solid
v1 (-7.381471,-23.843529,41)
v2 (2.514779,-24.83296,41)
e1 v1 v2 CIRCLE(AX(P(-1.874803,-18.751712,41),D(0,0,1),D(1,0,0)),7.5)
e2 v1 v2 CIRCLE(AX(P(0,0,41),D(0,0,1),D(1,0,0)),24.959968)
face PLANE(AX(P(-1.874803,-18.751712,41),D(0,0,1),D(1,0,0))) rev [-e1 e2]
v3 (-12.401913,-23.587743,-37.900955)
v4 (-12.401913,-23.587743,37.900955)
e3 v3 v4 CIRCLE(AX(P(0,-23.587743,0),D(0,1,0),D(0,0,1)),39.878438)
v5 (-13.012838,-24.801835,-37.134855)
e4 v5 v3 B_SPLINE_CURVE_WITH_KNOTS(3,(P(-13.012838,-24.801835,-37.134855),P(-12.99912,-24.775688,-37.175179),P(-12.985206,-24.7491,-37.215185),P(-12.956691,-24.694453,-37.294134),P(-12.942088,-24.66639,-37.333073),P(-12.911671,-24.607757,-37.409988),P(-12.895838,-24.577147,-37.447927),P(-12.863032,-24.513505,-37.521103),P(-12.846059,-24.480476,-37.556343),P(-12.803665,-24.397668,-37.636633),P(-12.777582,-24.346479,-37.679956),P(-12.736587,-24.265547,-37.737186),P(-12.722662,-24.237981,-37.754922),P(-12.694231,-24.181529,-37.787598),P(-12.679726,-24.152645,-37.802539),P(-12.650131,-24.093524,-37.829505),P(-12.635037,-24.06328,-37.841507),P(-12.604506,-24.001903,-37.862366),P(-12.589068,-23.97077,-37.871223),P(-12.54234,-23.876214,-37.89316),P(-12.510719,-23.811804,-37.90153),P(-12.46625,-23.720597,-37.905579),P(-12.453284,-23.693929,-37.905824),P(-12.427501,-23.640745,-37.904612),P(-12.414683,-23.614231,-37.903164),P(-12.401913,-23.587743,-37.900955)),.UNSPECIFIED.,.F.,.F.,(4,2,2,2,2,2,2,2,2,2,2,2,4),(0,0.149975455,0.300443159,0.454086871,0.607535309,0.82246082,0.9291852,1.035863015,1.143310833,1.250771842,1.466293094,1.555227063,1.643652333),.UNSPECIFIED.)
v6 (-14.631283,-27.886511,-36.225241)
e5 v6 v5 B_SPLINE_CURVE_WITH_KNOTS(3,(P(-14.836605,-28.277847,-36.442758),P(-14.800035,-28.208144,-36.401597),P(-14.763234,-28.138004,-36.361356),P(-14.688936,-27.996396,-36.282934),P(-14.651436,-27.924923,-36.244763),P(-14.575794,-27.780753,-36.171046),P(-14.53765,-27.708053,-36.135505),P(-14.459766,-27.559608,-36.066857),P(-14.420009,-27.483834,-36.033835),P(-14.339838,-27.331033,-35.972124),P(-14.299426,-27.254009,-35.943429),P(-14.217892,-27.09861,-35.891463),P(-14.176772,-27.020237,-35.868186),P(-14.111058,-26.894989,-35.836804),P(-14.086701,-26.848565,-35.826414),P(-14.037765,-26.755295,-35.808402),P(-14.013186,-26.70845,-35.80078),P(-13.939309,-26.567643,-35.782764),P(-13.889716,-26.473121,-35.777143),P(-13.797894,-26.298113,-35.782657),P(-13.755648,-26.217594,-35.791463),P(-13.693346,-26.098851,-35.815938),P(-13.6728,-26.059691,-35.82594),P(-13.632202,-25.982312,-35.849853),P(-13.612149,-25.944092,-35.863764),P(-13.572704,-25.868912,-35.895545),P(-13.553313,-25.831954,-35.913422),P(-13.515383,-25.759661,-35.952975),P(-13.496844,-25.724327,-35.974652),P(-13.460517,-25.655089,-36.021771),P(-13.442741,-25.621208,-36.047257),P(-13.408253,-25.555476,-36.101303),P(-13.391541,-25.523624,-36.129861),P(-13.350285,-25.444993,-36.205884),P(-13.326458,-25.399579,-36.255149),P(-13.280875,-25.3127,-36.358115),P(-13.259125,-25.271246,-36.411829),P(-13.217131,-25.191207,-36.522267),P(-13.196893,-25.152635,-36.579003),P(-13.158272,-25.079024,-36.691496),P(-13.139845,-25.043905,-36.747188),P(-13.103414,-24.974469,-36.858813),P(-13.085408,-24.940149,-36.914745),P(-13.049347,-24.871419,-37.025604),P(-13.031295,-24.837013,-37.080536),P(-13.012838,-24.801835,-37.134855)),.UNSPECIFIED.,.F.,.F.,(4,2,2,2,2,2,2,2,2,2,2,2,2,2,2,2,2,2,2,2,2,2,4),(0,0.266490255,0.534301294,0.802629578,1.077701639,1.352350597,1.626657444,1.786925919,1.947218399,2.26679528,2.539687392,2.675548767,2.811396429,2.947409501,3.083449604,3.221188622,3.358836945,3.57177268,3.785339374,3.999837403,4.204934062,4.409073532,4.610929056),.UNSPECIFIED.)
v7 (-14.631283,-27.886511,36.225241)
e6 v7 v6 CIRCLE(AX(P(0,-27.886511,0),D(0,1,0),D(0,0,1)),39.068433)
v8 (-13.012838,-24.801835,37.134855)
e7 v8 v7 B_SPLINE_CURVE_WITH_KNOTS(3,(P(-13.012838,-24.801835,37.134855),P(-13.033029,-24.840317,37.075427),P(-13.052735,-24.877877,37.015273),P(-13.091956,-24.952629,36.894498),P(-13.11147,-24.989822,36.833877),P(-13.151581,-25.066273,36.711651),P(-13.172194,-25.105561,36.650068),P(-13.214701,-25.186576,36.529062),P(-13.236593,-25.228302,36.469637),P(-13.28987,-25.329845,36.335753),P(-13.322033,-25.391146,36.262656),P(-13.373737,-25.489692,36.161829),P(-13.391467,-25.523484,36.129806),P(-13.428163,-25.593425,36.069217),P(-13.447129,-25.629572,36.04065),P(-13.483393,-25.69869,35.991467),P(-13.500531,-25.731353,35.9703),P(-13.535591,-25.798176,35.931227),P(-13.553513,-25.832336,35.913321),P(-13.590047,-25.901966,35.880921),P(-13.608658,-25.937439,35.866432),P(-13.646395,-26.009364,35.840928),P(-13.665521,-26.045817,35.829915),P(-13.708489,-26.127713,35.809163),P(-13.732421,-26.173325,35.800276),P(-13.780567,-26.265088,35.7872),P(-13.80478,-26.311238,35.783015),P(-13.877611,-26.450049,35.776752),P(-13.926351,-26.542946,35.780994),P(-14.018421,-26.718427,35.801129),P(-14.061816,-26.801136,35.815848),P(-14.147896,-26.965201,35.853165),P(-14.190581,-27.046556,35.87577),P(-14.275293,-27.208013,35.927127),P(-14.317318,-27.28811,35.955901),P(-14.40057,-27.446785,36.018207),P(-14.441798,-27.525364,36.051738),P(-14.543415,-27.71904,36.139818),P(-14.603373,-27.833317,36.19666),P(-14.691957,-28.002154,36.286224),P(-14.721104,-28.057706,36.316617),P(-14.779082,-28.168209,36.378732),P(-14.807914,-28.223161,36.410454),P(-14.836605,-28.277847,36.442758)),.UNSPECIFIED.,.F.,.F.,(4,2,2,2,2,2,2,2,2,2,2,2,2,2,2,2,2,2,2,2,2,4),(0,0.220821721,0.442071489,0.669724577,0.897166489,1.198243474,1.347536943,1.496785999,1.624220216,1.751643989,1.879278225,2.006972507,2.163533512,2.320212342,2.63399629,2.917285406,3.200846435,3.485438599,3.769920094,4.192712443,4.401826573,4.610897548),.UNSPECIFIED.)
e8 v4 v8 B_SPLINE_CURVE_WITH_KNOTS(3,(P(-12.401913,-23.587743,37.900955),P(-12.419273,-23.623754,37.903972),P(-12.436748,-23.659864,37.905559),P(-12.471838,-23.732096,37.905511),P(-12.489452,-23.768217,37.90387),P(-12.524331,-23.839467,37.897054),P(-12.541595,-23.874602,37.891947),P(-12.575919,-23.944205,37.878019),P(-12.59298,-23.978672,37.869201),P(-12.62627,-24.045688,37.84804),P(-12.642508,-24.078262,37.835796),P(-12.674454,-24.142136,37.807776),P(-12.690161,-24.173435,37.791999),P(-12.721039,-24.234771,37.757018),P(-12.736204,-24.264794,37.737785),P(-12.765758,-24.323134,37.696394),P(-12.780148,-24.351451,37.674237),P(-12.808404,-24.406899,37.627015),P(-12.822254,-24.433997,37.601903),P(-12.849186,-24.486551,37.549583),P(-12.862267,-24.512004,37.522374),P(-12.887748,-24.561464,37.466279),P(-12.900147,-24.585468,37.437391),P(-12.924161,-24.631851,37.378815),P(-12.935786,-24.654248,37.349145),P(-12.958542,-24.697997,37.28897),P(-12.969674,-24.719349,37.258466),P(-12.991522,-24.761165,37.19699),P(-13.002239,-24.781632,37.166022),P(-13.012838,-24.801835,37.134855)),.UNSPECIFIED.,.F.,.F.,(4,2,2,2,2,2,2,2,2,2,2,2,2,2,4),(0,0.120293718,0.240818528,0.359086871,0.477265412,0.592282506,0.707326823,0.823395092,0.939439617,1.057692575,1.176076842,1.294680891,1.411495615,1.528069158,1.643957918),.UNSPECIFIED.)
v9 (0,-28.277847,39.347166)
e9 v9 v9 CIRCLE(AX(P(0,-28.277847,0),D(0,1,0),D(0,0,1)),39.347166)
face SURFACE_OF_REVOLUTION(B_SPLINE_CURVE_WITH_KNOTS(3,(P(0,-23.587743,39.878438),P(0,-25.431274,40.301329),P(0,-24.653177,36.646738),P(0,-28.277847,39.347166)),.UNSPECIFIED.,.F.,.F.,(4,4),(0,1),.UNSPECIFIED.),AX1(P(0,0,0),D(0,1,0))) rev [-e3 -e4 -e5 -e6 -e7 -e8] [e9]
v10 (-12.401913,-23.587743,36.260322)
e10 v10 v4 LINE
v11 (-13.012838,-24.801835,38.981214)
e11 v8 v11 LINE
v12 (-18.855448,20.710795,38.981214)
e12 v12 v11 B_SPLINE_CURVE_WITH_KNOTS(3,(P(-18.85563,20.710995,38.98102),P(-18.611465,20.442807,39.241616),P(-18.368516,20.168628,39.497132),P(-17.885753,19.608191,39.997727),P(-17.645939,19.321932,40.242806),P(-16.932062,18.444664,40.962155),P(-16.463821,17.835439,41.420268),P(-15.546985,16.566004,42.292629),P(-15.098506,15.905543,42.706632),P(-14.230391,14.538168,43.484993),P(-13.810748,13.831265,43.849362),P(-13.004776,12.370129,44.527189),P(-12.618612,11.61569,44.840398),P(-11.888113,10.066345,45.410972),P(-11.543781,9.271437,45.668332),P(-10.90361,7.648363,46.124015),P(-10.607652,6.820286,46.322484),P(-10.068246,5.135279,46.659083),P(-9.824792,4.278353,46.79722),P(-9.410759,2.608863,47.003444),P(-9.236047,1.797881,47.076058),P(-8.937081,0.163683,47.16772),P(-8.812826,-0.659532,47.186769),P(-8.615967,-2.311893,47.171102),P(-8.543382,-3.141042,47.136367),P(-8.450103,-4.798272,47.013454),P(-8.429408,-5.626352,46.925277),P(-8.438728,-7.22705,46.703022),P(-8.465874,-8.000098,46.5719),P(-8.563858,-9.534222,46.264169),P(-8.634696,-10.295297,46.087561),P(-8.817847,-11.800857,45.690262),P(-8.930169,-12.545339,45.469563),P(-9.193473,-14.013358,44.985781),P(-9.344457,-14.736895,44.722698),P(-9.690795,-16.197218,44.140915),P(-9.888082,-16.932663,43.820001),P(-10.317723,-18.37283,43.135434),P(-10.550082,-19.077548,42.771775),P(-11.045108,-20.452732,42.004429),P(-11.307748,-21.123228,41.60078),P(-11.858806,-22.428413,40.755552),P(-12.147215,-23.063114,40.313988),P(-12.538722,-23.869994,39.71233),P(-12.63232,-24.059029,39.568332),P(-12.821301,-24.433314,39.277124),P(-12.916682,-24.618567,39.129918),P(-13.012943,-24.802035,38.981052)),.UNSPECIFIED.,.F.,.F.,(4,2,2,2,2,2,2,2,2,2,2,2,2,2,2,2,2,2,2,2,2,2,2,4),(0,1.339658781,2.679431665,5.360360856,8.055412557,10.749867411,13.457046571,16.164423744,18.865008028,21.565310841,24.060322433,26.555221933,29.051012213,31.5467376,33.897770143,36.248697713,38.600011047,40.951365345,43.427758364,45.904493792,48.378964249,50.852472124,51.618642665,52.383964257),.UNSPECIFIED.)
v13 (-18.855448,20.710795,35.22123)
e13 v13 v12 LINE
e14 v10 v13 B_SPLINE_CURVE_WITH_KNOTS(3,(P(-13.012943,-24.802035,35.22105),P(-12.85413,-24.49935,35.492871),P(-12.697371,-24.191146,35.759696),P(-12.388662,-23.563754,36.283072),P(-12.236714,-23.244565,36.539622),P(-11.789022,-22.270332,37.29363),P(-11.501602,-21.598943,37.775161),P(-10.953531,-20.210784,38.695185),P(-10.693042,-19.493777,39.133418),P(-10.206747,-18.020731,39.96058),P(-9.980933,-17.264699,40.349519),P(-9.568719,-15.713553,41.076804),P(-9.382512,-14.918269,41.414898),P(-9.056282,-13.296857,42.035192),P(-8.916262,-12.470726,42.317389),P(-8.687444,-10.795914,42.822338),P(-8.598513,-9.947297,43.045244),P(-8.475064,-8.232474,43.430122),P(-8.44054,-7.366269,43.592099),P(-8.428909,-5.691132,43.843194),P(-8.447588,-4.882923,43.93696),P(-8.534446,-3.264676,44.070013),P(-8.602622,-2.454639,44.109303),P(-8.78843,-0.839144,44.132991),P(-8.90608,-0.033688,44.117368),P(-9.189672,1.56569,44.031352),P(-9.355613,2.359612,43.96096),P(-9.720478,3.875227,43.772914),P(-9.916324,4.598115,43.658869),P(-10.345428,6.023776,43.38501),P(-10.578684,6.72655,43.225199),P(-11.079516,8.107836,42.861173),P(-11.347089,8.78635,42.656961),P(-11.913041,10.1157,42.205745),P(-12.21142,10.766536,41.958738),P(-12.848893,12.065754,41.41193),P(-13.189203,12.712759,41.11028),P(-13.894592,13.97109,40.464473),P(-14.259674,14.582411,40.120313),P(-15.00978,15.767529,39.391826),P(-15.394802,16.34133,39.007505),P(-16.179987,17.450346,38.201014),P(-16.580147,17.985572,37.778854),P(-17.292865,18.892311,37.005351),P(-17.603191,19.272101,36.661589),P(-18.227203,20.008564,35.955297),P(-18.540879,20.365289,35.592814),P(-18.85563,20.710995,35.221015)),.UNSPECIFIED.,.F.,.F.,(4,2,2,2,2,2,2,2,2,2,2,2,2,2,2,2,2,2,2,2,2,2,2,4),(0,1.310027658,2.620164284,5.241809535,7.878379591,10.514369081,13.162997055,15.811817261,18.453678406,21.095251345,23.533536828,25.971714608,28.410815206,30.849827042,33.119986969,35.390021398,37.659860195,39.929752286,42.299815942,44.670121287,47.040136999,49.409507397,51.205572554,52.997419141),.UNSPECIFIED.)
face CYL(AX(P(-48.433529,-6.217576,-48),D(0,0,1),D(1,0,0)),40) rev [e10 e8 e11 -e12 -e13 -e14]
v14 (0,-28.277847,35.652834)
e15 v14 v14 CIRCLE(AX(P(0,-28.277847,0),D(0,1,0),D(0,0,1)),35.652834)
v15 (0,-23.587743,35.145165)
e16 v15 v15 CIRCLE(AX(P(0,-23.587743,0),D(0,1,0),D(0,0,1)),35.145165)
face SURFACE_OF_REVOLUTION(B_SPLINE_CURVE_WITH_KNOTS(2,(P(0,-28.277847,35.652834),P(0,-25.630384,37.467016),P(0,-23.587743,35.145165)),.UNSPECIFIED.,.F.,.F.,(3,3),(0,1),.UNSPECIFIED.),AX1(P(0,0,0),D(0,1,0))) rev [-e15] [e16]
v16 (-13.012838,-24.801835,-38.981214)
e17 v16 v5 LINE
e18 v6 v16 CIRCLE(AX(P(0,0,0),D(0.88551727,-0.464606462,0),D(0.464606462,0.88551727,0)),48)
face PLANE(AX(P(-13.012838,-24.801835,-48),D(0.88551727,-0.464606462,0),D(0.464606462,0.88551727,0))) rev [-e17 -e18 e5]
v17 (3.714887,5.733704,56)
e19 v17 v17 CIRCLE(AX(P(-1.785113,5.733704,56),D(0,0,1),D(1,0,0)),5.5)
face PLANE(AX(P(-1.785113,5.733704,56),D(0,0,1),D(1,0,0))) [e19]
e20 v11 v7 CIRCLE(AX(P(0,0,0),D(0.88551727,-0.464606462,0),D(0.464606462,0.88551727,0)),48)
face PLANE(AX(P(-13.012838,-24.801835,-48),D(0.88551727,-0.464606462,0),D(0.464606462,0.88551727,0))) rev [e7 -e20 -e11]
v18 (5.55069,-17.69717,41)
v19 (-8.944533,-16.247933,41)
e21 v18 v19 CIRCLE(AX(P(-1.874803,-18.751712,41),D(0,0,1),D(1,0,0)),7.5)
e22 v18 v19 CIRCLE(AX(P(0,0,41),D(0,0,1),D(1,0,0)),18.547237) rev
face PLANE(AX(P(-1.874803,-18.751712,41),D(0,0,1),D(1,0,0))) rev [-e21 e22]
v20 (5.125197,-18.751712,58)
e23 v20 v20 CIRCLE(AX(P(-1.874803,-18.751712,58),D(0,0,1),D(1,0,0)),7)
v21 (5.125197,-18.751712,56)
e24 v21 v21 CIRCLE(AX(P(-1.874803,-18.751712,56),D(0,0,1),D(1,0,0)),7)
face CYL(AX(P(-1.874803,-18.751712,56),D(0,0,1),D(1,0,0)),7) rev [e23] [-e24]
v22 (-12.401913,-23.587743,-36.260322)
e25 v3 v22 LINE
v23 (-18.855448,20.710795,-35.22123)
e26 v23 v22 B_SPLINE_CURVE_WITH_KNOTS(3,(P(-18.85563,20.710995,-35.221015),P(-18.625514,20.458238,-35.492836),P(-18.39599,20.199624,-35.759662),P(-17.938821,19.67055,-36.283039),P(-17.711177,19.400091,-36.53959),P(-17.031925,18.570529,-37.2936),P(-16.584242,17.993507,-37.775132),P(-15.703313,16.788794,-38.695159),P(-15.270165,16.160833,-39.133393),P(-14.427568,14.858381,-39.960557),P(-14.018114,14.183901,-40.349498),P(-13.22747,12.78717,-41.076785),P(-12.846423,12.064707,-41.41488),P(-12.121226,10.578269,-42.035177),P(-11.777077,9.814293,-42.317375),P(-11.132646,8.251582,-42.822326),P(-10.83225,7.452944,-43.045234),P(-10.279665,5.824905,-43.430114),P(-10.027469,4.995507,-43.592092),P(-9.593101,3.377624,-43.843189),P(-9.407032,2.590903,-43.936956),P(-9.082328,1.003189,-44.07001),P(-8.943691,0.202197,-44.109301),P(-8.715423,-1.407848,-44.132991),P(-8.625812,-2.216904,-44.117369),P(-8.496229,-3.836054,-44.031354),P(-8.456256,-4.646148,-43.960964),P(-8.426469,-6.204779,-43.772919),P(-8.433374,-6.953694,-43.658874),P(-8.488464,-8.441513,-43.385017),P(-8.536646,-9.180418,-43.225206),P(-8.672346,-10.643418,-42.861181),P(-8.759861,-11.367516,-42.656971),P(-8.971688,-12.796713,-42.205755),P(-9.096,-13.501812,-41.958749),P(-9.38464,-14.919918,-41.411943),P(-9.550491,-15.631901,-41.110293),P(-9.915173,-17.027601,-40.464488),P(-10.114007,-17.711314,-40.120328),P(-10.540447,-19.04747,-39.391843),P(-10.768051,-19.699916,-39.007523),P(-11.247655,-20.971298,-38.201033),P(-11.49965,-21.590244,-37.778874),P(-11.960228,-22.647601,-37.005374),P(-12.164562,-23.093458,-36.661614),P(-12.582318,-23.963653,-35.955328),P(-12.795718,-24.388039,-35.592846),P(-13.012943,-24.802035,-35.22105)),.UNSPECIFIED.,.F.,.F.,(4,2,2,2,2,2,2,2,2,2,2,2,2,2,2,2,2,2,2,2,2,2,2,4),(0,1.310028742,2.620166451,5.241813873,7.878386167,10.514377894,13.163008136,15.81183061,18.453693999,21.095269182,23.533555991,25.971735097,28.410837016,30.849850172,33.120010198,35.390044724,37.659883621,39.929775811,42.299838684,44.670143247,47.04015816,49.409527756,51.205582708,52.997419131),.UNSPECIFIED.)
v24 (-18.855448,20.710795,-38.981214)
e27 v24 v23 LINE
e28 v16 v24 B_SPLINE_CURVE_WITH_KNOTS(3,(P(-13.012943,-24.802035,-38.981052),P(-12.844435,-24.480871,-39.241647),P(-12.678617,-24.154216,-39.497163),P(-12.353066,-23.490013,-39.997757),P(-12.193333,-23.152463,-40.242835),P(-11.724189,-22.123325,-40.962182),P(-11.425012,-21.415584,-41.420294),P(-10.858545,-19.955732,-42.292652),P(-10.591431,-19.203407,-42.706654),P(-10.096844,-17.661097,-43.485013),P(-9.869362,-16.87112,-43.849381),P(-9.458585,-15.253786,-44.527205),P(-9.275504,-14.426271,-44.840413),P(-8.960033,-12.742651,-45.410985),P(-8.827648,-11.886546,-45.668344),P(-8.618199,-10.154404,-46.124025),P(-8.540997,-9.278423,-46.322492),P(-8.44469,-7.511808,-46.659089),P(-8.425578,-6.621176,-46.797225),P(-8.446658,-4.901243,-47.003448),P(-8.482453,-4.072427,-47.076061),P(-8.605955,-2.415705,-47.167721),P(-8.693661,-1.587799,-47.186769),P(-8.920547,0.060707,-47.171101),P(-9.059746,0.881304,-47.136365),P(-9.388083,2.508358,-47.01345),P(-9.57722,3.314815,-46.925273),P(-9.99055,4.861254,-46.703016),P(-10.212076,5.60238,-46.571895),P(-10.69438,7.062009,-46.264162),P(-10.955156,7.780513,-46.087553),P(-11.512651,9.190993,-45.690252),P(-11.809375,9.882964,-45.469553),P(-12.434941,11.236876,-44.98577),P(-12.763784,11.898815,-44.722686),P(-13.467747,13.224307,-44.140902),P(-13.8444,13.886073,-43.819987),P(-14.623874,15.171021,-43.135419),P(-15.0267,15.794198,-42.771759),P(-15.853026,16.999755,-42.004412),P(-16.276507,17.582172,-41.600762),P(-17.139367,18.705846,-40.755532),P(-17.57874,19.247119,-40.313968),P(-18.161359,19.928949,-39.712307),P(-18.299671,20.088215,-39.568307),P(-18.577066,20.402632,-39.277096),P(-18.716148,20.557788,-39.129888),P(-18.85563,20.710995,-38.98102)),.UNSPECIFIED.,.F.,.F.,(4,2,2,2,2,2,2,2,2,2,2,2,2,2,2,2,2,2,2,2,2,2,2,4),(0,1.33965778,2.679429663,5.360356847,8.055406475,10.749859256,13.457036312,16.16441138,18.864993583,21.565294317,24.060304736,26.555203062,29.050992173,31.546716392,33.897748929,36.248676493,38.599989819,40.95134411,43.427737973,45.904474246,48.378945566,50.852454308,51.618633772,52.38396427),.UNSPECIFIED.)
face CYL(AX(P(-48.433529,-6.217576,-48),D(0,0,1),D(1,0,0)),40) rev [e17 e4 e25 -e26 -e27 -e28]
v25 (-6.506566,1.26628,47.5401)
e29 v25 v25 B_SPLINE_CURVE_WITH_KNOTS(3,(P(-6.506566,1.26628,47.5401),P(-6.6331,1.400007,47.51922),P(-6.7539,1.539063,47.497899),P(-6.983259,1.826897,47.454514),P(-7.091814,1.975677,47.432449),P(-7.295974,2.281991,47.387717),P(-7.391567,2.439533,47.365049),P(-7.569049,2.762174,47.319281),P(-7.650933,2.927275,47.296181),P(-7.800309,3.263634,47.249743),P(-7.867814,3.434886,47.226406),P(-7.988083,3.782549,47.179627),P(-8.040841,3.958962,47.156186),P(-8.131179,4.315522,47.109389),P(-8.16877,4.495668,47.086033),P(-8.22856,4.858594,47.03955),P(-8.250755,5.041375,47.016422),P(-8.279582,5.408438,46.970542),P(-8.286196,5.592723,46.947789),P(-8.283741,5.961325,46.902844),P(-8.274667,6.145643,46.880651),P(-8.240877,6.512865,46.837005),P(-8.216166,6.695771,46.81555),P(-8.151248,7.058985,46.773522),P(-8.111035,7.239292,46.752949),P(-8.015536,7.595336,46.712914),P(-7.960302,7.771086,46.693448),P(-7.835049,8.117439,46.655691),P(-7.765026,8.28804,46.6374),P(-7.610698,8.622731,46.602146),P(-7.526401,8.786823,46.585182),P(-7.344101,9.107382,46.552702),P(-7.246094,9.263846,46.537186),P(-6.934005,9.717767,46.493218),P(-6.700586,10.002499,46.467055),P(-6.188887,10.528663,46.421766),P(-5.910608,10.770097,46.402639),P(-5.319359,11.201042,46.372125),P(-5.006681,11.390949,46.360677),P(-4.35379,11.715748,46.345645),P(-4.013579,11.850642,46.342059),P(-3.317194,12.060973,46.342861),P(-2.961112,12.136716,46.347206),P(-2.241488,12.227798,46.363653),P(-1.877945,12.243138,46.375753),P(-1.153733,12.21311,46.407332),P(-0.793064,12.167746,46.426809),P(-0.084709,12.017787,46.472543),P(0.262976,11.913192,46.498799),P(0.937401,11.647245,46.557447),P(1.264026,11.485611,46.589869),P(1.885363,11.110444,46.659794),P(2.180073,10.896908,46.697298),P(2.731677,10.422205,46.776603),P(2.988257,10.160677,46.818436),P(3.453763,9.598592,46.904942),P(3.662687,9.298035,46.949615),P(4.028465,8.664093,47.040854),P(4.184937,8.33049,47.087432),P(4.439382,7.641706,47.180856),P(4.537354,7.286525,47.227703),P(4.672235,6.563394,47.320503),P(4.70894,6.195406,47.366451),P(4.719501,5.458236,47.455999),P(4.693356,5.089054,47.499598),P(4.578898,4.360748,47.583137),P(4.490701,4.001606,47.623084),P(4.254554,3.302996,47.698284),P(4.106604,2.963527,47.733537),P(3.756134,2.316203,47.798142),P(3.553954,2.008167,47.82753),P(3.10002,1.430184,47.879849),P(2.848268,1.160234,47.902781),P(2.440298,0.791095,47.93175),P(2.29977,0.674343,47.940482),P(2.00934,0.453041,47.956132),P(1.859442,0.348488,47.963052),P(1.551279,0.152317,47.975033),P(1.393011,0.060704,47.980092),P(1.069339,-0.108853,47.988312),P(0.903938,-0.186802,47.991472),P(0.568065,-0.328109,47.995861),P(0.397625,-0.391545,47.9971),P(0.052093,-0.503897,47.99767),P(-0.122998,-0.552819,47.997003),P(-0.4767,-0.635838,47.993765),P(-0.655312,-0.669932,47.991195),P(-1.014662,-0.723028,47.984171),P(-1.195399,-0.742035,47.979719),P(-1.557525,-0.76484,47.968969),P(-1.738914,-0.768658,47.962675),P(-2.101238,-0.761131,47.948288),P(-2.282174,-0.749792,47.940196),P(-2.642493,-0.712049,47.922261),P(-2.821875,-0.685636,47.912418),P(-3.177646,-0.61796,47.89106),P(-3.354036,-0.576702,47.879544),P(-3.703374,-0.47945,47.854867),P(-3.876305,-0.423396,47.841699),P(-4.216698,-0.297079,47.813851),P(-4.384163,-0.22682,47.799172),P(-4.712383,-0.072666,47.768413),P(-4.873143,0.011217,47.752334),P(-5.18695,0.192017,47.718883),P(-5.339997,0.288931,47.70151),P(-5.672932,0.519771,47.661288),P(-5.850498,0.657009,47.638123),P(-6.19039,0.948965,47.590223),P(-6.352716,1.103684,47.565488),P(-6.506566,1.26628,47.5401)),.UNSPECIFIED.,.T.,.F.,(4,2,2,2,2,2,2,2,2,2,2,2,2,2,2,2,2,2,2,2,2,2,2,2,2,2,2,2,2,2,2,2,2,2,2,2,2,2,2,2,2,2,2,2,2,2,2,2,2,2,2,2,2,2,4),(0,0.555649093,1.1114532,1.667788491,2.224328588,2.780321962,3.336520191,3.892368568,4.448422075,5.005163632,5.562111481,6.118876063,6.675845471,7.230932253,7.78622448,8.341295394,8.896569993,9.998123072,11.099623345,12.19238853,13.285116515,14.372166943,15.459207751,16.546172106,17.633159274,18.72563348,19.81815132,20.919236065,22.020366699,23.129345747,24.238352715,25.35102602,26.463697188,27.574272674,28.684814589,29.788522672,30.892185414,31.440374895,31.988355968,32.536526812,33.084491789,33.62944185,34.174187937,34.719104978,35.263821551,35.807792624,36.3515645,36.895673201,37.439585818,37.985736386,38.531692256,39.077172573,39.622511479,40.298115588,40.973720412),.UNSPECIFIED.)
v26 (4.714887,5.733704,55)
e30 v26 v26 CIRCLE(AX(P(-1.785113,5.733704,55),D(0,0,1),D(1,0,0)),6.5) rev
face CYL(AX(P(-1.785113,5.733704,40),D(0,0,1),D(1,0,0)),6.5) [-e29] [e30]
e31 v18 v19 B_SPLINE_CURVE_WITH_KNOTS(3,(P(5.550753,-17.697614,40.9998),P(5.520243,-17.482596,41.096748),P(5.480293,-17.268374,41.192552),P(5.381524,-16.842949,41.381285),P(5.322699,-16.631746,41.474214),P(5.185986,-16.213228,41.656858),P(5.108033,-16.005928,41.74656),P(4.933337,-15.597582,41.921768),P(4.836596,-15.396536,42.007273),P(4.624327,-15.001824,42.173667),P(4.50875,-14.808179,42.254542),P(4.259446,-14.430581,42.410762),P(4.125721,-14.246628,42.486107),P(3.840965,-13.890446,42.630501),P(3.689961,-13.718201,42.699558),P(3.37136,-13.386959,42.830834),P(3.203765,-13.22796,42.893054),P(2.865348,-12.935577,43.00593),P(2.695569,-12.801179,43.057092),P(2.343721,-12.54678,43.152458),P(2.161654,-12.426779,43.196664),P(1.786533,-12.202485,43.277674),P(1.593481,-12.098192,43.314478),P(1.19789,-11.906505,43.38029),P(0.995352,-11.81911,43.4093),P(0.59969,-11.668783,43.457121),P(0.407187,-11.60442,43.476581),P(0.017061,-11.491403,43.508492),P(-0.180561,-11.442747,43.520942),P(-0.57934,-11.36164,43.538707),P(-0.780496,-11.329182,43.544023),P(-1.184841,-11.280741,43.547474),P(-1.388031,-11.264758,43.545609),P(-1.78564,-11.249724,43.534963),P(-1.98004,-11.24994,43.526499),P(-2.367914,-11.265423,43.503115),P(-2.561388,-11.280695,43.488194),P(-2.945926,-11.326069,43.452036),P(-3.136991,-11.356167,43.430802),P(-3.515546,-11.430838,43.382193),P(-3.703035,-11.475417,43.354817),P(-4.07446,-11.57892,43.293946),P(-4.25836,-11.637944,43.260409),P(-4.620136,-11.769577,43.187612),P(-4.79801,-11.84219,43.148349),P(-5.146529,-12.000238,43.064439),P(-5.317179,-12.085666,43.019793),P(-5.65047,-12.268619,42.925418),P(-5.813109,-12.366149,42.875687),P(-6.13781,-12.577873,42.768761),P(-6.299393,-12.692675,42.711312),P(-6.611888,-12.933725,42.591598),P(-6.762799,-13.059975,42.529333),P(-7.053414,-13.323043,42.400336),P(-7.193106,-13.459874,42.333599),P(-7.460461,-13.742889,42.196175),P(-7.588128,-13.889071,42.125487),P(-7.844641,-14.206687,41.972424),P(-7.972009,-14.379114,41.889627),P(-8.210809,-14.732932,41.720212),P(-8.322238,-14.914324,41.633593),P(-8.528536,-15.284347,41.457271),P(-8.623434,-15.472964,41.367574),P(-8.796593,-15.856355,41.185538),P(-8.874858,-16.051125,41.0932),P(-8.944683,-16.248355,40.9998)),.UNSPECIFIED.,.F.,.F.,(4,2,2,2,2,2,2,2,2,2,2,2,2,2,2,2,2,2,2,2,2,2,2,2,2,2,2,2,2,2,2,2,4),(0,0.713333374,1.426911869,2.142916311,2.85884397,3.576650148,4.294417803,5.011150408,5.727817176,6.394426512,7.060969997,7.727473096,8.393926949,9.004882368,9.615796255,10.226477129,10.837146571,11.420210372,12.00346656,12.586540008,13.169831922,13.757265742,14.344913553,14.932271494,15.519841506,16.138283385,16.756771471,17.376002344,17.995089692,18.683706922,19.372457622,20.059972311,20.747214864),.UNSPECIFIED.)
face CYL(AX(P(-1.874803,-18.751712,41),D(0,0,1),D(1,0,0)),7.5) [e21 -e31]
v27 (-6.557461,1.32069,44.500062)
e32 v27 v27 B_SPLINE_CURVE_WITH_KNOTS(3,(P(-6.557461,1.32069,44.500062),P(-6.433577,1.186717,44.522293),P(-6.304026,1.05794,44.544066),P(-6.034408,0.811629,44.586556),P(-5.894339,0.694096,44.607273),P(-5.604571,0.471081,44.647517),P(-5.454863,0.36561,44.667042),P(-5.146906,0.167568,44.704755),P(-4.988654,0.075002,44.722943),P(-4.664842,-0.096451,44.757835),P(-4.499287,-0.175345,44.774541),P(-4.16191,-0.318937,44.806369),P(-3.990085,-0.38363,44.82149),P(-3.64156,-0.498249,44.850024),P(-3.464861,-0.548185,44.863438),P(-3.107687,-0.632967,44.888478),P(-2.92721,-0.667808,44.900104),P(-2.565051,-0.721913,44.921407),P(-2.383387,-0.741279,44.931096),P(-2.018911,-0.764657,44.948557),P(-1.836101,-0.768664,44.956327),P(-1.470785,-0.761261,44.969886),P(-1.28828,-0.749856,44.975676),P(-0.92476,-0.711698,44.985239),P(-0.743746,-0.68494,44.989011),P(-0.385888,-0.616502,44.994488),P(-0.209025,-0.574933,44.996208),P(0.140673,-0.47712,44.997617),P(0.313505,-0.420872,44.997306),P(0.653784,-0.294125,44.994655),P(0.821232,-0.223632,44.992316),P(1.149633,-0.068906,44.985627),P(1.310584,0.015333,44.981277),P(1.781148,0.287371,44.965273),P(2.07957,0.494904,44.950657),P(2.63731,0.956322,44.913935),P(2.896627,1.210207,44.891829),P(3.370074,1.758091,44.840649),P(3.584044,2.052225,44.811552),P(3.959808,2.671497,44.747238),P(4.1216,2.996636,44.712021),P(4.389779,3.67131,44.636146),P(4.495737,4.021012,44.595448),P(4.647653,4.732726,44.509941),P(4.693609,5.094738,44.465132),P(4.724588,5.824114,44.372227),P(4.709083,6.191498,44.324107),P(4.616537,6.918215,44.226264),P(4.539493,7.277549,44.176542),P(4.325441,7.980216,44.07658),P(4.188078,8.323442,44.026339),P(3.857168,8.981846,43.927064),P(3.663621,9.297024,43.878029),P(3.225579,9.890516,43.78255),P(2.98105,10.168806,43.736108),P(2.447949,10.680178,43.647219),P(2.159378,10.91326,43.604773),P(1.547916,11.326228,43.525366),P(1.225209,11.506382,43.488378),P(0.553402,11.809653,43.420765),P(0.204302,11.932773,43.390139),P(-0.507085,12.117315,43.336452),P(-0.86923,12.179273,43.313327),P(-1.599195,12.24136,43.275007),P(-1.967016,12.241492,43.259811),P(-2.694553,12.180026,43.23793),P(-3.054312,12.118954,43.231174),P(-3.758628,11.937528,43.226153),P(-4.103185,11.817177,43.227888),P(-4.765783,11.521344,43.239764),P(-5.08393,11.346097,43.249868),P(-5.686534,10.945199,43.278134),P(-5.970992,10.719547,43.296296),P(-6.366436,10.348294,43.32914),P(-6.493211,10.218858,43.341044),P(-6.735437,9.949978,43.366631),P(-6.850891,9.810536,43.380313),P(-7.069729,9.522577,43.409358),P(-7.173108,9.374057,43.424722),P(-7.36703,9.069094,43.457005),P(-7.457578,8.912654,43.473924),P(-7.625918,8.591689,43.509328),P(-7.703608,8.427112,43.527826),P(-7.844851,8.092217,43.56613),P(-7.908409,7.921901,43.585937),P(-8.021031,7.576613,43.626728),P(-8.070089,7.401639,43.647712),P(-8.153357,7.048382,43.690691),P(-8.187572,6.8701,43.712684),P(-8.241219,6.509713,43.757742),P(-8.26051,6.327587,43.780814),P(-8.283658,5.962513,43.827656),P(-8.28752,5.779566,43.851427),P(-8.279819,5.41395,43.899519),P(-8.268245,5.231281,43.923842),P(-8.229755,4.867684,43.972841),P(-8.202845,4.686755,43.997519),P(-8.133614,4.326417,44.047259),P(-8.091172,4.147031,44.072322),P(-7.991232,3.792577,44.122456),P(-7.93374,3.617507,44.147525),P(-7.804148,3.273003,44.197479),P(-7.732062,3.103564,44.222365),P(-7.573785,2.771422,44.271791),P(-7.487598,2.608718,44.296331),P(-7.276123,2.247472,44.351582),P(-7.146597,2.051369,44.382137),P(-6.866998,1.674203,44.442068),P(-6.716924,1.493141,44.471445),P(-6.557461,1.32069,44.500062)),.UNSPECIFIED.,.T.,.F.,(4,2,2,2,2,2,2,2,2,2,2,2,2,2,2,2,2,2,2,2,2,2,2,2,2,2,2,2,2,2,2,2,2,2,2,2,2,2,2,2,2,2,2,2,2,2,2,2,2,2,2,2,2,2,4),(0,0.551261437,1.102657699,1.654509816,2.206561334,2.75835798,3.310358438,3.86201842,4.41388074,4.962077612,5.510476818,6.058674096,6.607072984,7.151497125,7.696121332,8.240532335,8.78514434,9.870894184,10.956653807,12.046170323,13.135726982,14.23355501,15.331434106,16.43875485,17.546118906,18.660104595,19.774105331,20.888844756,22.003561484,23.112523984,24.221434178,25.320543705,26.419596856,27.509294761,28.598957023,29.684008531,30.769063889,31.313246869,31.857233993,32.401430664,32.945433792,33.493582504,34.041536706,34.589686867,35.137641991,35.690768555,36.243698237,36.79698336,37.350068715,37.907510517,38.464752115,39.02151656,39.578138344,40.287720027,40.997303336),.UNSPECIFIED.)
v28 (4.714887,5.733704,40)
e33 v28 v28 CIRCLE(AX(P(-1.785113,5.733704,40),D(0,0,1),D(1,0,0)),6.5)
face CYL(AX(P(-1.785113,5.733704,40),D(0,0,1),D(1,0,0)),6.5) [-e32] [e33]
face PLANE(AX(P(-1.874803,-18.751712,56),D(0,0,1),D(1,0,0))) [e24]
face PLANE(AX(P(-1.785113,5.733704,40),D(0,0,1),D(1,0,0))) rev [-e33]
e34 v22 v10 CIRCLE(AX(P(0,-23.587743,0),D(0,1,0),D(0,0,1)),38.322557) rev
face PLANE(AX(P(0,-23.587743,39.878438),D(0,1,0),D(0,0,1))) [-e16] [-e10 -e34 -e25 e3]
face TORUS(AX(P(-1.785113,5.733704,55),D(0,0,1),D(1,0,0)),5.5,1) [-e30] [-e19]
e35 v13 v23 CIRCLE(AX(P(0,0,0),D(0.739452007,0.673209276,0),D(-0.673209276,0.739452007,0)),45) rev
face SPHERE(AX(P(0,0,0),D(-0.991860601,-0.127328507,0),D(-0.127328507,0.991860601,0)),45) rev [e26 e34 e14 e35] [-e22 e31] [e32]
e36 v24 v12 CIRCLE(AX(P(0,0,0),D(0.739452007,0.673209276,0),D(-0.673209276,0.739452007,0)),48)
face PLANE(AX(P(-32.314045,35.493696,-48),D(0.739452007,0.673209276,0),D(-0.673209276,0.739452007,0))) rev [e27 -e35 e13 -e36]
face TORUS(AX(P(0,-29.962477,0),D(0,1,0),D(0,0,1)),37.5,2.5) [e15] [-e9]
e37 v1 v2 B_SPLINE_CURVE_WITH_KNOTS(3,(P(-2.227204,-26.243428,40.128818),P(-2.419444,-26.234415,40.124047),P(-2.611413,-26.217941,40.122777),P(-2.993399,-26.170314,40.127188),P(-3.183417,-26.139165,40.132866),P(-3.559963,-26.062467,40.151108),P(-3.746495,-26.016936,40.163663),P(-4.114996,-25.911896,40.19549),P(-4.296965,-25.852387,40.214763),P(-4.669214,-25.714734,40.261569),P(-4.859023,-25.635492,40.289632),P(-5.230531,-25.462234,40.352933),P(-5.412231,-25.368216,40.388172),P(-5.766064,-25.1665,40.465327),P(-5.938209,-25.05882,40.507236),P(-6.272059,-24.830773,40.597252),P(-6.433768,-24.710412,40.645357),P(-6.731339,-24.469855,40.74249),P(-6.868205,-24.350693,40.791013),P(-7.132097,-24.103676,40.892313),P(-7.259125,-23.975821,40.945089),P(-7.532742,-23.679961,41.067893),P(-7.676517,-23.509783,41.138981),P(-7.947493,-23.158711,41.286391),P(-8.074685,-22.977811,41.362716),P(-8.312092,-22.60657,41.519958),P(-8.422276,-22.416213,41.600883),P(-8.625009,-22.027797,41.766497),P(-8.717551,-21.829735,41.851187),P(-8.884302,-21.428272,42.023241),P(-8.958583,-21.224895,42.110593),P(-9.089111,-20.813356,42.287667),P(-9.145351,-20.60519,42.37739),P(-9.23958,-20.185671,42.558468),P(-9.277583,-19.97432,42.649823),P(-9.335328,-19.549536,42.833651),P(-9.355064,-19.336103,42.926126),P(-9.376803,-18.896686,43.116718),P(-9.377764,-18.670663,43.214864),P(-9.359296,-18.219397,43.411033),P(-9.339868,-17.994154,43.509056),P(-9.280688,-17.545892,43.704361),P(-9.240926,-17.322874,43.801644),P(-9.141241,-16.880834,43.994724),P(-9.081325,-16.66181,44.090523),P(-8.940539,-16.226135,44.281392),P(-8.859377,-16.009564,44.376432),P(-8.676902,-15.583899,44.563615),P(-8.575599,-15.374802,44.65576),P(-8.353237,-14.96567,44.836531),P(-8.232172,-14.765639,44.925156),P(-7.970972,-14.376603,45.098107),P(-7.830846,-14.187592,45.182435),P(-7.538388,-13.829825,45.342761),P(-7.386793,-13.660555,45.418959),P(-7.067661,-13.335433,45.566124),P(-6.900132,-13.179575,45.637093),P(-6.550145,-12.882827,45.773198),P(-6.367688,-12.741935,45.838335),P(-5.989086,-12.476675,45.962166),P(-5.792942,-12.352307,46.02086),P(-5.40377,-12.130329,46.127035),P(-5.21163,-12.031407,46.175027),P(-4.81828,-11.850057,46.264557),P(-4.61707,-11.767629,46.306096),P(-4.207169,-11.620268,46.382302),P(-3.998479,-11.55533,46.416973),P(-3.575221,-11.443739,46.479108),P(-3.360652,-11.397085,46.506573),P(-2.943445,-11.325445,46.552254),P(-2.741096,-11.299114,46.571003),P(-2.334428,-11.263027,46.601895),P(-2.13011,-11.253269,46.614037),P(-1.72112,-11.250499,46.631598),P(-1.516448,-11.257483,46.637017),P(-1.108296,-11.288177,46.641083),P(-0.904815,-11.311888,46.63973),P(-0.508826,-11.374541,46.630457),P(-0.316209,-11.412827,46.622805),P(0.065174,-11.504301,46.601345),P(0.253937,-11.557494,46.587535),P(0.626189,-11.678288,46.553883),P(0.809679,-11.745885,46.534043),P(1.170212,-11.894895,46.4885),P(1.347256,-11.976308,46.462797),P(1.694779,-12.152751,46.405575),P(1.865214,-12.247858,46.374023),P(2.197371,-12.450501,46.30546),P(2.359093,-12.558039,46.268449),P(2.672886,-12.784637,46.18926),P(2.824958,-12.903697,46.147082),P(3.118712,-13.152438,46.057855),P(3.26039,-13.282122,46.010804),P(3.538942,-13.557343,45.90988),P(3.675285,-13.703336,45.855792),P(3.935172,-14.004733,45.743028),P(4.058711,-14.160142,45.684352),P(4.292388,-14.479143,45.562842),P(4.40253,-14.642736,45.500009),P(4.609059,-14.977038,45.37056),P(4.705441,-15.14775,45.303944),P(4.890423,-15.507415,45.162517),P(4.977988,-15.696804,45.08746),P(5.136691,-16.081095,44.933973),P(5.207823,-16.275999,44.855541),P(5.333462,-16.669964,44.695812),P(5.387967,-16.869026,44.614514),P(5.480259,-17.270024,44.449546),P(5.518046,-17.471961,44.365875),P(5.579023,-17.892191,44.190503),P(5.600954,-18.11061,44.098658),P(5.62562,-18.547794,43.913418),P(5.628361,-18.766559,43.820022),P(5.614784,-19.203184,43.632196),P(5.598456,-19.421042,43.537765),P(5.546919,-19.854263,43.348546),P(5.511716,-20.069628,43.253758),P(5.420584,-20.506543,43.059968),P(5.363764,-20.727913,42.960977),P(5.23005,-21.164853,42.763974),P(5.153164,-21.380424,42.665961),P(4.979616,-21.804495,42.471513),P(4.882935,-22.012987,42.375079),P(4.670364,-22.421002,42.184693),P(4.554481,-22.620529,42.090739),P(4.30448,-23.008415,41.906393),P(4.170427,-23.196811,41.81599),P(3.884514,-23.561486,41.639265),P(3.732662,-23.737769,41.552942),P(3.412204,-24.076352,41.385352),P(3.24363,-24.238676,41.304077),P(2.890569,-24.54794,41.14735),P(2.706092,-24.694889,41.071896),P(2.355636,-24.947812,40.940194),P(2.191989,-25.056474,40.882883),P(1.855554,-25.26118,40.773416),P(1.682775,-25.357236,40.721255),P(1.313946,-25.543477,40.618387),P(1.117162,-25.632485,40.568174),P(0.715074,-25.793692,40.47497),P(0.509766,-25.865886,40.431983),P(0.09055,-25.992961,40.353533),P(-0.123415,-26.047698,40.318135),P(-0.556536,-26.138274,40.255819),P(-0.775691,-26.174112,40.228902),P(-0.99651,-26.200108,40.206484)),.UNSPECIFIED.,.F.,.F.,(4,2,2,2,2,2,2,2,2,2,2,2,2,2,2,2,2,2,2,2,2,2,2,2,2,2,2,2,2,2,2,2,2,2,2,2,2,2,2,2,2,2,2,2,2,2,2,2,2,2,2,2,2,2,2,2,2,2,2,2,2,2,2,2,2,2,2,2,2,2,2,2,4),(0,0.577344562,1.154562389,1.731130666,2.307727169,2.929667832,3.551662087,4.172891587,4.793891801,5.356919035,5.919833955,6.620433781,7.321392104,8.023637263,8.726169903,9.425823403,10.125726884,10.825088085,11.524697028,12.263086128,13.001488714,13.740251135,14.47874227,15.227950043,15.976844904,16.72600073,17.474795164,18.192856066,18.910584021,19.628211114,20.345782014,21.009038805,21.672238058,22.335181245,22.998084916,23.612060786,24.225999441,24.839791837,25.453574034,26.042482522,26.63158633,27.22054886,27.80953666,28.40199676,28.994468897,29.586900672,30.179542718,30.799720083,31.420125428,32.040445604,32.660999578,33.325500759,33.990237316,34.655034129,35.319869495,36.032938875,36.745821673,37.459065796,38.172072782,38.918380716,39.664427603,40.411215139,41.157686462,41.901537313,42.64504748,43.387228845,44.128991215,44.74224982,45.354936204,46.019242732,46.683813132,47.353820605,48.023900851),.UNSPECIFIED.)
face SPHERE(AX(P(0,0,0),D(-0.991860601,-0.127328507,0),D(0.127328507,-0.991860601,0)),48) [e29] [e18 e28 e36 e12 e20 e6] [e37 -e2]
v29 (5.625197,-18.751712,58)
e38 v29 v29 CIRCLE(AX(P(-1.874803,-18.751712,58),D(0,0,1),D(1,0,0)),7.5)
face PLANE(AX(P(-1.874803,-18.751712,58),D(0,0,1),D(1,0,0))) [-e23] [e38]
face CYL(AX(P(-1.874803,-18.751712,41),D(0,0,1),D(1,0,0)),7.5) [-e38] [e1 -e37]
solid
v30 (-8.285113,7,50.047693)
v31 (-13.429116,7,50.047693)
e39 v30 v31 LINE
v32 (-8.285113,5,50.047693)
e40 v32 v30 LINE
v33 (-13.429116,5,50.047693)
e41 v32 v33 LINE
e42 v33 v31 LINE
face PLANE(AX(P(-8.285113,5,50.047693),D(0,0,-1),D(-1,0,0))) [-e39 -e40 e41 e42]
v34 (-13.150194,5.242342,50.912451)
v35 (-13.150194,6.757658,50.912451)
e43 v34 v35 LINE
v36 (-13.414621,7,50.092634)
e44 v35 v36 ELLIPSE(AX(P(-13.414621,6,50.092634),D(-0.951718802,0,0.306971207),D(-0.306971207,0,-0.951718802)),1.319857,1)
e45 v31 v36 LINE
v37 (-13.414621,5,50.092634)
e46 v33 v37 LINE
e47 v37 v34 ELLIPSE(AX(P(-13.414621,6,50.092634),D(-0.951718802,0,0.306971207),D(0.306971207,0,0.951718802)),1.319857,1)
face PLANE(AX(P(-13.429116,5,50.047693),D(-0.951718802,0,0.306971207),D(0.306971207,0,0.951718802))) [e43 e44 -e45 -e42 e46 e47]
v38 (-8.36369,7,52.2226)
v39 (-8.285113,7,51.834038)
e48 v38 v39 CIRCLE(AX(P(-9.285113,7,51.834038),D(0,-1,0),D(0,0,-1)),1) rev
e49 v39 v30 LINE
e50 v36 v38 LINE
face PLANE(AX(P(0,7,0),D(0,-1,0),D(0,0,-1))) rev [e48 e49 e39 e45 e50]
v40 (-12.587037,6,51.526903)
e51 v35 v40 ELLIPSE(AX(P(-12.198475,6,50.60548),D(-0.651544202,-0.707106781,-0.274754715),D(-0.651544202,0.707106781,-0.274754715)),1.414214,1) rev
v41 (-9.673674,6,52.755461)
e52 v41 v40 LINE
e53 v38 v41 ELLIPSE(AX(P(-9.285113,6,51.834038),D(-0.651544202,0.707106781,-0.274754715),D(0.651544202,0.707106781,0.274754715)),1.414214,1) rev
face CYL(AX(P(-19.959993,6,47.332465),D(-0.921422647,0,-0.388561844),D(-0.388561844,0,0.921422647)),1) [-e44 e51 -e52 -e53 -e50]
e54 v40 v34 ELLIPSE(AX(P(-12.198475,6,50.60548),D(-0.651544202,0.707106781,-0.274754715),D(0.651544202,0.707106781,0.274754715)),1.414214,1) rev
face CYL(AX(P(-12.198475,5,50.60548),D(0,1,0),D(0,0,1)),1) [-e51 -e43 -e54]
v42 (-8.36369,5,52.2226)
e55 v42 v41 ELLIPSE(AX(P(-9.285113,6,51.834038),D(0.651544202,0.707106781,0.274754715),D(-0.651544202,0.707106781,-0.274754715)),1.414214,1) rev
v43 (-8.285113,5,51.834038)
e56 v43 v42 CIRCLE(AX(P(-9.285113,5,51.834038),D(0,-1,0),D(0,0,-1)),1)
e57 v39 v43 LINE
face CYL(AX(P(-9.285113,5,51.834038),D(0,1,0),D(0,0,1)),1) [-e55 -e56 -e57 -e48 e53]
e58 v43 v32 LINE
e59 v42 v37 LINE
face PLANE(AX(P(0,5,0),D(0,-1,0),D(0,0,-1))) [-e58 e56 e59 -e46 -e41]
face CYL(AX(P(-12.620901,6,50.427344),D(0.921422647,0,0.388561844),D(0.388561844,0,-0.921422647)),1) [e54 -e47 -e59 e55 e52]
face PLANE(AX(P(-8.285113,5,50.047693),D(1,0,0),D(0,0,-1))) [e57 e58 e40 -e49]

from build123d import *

# Parameters (mm, degrees)
CUT_EXTRUDE1_DEPTH       = 84.138438763
CUT_EXTRUDE1_DEPTH_BACK  = 84.138438763
SKETCH4_R                = 37.5
CUT_EXTRUDE2_DEPTH       = 30
BOSS_EXTRUDE1_DEPTH      = 10
BOSS_EXTRUDE1_DEPTH_BACK = 7
SKETCH8_R                = 7.5
SKETCH9_R                = 7
CUT_EXTRUDE3_DEPTH       = 2
SKETCH10_R               = 6.5
BOSS_EXTRUDE2_DEPTH      = 16
BOSS_EXTRUDE3_DEPTH      = 1
BOSS_EXTRUDE3_DEPTH_BACK = 1
FILLET1_R                = 1
FILLET2_R                = 1


with BuildPart() as part:
    # Sketch1 → Revolve2 (revolve)
    with BuildSketch(Plane.XY, mode=Mode.PRIVATE) as revolve2_sk:
        with BuildLine():
            Line((-32.314045232, 35.493696352), (-30.294417405, 33.27534033))
            ThreePointArc((-30.294417405, 33.27534033), (15.527182125, 42.236318676), (44.633727032, 5.729782823))
            Line((44.633727032, 5.729782823), (47.609308835, 6.111768345))
            ThreePointArc((47.609308835, 6.111768345), (16.5623276, 45.052073254), (-32.314045232, 35.493696352))
        make_face()
    revolve(revolve2_sk.sketch.rotate(Axis((44.633727032, 5.729782823, 0), (0.9918606007187919, 0.12732850718420158, 0)), 180), axis=Axis((44.633727032, 5.729782823, 0), (0.9918606007187919, 0.12732850718420158, 0)))

    # Sketch2 → Cut-Extrude1 (cut, two sides: drawn at the far end of the back side and taken through both)
    with BuildSketch(Plane.XY.offset(-CUT_EXTRUDE1_DEPTH_BACK)):
        with BuildLine():
            Line((-32.314045232, 35.493696352), (-18.855448385, 20.710794787))
            ThreePointArc((-18.855448385, 20.710794787), (-8.759104649, -1.124435952), (-13.012837873, -24.80183471))
            Line((-13.012837873, -24.80183471), (-22.301110165, -42.504828966))
            Line((-22.301110165, -42.504828966), (-32.314045232, 35.493696352))
        make_face()
    extrude(amount=CUT_EXTRUDE1_DEPTH + CUT_EXTRUDE1_DEPTH_BACK, mode=Mode.SUBTRACT)

    # Sketch4 → Cut-Extrude2 (cut)
    with BuildSketch(Plane(origin=(0, -48, 0), x_dir=(1, 0, 0), z_dir=(0, 1, 0))):
        Circle(SKETCH4_R)
    extrude(amount=CUT_EXTRUDE2_DEPTH, mode=Mode.SUBTRACT)

    # Sketch7 → Revolve3 (revolve)
    with BuildSketch(Plane(origin=(0, 0, 0), x_dir=(0, 0, -1), z_dir=(1, 0, 0))):
        with BuildLine():
            Line((-39.878437938, -23.587743123), (-35.145164985, -23.587743123))
            add(Edge.make_bspline(
                [(-35.145164985, -23.587743123), (-37.467015888, -25.630384459), (-35.652834068, -28.277846598)],
                knots=[0, 0, 0, 1, 1, 1], degree=2))
            ThreePointArc((-35.652834068, -28.277846598), (-37.5, -32.462476533), (-39.347165932, -28.277846598))
            add(Edge.make_bspline(
                [(-39.878437938, -23.587743123), (-40.301329239, -25.431274232), (-36.64673771, -24.653176545), (-39.347165932, -28.277846598)],
                knots=[0, 0, 0, 0, 1, 1, 1, 1], degree=3))
        make_face()
    revolve(axis=Axis((0, 0, 0), (0, -1, 0)))

    # Sketch8 → Boss-Extrude1 (add, two sides: drawn at the far end of the back side and taken through both)
    with BuildSketch(Plane.XY.offset(48).offset(-BOSS_EXTRUDE1_DEPTH_BACK)):
        with Locations((-1.874802676, -18.751711843)):
            Circle(SKETCH8_R)
    extrude(amount=BOSS_EXTRUDE1_DEPTH + BOSS_EXTRUDE1_DEPTH_BACK)

    # Sketch9 → Cut-Extrude3 (cut)
    with BuildSketch(Plane.XY.offset(58)):
        with Locations((-1.874802676, -18.751711843)):
            Circle(SKETCH9_R)
    extrude(amount=-CUT_EXTRUDE3_DEPTH, mode=Mode.SUBTRACT)

    # Sketch10 → Boss-Extrude2 (add)
    with BuildSketch(Plane.XY.offset(56)):
        with Locations((-1.785112509, 5.733703861)):
            Circle(SKETCH10_R)
    extrude(amount=-BOSS_EXTRUDE2_DEPTH)

    # Fillet1
    fillet1_edges = [part.edges().sort_by_distance(p)[0] for p in [
        (-8.285112509, 5.733703861, 56),
    ]]
    fillet(fillet1_edges, radius=FILLET1_R)


with BuildPart() as body_2:
    # Sketch13 → Boss-Extrude3 (new, two sides: drawn at the far end of the back side and taken through both)
    with BuildSketch(Plane(origin=(0, 6, 0), x_dir=(1, 0, 0), z_dir=(0, 1, 0)).offset(-BOSS_EXTRUDE3_DEPTH_BACK)):
        Polygon((-8.285112509, -50.047693497), (-13.429116403, -50.047693497), (-13.009463098, -51.348766468), (-8.285112509, -53.341014415), align=None)
    extrude(amount=BOSS_EXTRUDE3_DEPTH + BOSS_EXTRUDE3_DEPTH_BACK)

    # Fillet2
    fillet2_edges = [body_2.edges().sort_by_distance(p)[0] for p in [
        (-10.647287804, 7, 52.344890442),
        (-10.647287804, 5, 52.344890442),
        (-8.285112509, 6, 53.341014415),
        (-13.009463098, 6, 51.348766468),
    ]]
    fillet(fillet2_edges, radius=FILLET2_R - 0.0001)  # a hair under: the kernel refuses the full size


solid = Compound([part.part, body_2.part])
